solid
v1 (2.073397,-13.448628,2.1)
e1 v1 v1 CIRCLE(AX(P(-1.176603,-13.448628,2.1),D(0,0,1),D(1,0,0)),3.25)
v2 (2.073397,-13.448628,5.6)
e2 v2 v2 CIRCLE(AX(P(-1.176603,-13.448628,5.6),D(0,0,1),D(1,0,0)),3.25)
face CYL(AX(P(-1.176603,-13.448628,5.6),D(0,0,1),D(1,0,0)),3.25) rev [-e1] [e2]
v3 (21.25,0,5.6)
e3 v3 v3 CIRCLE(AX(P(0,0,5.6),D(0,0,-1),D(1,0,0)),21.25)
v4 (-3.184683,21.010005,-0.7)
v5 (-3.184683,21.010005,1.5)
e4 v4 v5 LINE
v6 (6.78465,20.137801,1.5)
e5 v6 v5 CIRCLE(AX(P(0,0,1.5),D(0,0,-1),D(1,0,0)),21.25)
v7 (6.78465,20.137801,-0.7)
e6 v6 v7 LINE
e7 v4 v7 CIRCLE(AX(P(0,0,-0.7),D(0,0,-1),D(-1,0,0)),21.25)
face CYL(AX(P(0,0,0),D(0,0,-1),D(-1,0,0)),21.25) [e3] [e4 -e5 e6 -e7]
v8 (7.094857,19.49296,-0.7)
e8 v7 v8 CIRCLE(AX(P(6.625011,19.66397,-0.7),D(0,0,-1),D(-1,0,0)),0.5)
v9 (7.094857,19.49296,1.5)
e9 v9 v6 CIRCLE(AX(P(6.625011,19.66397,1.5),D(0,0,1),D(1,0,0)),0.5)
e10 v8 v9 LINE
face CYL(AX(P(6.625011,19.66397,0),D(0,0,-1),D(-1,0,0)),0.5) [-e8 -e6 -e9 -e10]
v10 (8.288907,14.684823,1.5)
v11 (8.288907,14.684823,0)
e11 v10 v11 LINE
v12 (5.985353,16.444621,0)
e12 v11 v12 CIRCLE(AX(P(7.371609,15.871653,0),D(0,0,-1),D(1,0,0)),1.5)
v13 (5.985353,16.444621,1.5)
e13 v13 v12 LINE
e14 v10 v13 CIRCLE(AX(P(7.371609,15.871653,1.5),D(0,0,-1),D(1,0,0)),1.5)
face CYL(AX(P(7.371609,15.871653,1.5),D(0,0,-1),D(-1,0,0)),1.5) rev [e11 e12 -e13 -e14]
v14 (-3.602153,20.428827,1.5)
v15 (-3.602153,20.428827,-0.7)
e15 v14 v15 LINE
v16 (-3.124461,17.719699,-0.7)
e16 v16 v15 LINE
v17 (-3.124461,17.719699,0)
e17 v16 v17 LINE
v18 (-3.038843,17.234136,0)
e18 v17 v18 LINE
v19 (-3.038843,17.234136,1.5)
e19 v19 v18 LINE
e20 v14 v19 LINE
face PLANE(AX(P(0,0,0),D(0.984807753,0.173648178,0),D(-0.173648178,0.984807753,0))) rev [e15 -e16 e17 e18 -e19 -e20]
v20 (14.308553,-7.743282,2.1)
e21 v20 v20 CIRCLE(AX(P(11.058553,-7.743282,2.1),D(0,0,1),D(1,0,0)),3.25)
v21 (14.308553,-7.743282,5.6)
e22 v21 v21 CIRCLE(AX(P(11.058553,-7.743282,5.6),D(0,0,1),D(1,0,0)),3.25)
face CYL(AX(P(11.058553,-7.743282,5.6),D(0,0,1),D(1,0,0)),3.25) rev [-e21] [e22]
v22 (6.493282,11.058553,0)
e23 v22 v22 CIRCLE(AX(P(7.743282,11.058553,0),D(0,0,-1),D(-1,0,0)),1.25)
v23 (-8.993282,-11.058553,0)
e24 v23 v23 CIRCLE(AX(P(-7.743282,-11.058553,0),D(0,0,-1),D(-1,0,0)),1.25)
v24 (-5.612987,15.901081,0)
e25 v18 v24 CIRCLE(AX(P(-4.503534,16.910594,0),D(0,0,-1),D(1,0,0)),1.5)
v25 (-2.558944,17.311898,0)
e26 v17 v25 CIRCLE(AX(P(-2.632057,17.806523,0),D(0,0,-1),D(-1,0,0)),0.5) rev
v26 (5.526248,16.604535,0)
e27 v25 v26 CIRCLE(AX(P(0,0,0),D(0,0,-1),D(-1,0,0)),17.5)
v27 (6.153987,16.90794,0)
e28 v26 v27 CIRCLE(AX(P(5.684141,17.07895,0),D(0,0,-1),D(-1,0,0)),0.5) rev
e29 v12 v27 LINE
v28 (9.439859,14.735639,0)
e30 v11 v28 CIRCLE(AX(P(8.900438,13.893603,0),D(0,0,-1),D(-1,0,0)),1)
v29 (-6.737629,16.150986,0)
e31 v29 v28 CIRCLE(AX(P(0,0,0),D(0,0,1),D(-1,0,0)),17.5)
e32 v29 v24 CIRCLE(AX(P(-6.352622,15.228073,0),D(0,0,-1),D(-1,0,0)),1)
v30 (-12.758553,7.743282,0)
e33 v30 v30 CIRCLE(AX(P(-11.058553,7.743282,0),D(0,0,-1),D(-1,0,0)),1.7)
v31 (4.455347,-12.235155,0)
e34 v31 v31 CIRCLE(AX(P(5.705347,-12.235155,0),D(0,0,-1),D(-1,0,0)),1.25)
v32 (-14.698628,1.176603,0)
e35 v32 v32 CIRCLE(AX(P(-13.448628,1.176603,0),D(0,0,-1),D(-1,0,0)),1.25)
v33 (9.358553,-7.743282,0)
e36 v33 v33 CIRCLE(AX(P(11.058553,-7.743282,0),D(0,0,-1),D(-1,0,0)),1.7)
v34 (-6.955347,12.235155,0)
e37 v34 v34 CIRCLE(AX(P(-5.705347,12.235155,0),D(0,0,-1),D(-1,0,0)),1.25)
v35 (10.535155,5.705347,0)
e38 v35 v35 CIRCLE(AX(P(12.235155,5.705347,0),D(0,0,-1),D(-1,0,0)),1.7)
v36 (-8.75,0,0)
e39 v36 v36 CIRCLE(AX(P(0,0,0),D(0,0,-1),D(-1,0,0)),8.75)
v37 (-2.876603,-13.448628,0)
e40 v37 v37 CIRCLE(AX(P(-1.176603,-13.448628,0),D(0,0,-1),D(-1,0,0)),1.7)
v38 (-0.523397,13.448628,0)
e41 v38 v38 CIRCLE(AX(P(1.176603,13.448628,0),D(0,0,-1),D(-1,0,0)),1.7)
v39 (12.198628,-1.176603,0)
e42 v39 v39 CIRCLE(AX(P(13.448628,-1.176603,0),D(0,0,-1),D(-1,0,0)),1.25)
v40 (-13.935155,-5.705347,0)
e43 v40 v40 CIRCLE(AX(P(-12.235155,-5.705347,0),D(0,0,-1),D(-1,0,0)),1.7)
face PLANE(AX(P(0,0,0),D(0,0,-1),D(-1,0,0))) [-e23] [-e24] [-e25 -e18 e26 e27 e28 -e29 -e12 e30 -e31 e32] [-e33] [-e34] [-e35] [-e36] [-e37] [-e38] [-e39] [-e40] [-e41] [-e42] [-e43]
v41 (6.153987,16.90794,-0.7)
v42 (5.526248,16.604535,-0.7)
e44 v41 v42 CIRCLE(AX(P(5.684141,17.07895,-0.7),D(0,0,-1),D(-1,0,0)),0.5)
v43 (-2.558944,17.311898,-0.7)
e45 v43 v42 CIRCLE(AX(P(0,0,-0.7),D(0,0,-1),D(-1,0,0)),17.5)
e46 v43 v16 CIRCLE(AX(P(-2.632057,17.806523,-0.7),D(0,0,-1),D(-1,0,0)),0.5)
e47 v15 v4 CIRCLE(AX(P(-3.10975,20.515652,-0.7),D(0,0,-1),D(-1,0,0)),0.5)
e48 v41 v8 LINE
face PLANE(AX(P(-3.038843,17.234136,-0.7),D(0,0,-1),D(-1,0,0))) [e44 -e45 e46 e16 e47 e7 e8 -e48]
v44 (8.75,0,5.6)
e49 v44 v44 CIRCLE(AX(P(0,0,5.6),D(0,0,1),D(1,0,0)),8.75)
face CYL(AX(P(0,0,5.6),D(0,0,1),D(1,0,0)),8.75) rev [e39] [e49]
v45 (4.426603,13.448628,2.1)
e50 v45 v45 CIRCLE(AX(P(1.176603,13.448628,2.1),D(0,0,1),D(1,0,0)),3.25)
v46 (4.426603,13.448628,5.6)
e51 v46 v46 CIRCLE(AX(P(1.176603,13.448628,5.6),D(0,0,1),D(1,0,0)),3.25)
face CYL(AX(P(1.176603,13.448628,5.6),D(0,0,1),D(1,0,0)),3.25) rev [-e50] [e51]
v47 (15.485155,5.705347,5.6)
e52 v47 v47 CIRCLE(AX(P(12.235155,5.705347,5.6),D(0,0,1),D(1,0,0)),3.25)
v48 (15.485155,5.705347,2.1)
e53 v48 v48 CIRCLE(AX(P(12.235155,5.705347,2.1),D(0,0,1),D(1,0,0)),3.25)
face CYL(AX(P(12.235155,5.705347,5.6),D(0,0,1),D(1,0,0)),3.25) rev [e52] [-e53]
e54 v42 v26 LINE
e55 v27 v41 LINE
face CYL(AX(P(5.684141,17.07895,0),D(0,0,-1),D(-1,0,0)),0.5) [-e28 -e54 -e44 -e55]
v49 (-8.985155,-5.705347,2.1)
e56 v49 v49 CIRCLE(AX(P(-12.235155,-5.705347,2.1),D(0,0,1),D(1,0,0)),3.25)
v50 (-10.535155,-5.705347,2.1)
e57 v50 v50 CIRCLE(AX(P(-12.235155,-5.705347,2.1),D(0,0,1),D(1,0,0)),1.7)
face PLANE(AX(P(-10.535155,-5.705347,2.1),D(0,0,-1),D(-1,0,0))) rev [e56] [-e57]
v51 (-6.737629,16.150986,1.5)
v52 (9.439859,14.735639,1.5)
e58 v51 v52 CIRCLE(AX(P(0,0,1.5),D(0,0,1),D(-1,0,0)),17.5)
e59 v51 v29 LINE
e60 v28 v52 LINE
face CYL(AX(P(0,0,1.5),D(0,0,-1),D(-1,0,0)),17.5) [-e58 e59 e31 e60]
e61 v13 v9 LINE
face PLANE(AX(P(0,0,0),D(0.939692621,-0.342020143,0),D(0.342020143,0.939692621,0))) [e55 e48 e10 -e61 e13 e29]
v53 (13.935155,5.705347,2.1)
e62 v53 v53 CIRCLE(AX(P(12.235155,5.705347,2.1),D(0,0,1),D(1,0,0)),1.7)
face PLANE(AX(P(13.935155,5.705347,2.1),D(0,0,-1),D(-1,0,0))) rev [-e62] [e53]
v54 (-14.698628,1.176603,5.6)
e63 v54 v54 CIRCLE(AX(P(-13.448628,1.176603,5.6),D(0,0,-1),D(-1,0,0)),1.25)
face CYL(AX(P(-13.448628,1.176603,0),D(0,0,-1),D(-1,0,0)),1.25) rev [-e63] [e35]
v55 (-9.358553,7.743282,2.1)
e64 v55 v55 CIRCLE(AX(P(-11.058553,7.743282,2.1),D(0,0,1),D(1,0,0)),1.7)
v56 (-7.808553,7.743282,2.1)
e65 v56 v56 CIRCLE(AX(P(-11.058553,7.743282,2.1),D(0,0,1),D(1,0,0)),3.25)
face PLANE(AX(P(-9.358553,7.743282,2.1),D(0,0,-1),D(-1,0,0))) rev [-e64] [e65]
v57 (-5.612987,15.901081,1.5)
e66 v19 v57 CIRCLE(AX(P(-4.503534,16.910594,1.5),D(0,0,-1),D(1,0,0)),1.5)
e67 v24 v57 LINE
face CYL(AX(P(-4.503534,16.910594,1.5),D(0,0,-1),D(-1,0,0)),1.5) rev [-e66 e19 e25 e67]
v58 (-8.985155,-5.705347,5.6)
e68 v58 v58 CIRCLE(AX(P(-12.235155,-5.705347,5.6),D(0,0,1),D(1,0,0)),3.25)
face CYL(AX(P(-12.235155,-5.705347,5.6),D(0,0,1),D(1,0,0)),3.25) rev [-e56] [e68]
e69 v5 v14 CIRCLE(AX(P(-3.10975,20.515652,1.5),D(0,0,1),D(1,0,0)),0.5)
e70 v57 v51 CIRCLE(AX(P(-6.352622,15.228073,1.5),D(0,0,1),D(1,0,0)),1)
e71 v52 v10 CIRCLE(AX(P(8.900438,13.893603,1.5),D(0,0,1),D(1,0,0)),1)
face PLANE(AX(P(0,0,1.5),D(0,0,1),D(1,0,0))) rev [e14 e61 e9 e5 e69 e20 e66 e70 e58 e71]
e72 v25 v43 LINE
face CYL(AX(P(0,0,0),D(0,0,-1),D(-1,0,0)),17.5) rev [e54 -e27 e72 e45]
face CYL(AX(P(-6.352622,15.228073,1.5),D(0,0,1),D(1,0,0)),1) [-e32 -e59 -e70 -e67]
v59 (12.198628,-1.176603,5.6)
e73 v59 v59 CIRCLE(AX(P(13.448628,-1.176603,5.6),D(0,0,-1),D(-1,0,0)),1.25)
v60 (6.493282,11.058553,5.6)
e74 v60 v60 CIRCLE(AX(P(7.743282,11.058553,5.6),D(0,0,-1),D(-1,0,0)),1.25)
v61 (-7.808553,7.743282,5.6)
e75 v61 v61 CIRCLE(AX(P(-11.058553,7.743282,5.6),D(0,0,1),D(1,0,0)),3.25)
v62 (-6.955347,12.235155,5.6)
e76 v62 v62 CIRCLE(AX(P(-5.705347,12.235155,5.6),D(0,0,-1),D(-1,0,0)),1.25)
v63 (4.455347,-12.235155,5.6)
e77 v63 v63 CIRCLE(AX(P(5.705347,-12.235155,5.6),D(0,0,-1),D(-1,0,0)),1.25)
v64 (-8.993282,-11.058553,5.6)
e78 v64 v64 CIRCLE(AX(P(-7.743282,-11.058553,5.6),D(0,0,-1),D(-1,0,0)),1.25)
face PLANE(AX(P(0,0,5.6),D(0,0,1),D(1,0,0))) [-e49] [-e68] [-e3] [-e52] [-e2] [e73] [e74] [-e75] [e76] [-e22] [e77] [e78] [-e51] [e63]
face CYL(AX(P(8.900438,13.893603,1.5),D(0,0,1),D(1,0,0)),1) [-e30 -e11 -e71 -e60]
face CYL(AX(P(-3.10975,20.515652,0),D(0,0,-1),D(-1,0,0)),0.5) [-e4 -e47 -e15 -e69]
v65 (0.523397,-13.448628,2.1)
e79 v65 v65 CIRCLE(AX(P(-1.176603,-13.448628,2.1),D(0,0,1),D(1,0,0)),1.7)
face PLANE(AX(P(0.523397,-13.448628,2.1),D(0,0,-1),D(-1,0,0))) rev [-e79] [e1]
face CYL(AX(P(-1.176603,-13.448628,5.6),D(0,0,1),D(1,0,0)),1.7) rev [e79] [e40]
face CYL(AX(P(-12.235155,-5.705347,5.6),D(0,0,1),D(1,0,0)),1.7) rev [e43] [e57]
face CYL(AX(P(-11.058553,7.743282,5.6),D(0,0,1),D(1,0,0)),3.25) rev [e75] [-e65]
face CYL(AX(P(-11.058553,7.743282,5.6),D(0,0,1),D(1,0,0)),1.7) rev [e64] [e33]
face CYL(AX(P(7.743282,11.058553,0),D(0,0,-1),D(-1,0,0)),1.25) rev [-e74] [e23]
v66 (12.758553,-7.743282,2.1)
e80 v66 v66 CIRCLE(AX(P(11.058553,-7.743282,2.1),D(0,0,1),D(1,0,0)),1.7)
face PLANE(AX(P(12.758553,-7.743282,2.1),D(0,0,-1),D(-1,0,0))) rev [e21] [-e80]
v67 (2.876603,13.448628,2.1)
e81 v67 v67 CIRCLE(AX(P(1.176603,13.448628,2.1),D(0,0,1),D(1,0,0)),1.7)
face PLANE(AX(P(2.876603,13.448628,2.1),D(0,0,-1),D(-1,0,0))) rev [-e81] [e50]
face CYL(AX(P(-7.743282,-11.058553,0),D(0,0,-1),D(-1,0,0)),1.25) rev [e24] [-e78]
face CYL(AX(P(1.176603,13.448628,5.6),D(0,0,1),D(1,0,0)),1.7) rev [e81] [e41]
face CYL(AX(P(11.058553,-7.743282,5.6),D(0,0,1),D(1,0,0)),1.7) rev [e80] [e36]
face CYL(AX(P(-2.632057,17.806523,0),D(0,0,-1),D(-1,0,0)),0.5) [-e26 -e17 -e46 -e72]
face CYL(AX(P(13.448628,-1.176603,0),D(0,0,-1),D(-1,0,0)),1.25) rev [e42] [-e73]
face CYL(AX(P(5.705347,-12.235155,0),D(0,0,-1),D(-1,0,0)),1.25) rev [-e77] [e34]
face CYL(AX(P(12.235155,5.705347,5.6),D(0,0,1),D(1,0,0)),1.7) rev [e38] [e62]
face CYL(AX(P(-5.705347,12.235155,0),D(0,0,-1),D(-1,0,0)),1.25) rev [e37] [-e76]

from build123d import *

# Parameters (mm, degrees)
SKETCH_1_W                    = 3.75
SKETCH_1_H                    = 0.7
REVOLVE_1_ANGLE               = 30
EXTRUDE_1_DEPTH               = 1.5
EXTRUDE_START                 = -4.1
SKETCH_3_R                    = 21.25
EXTRUDE_2_DEPTH               = 4.1
HOLE_WIZARD_2_5_2_5_1_D       = 2.5
HOLE_WIZARD_17_5_17_5_1_D     = 17.5
HOLE_WIZARD_17_5_17_5_1_DEPTH = 6.3
HOLE_WIZARD_M3_1_D            = 3.4
HOLE_WIZARD_M3_1_DEPTH        = 6.3
HOLE_WIZARD_M3_1_CBORE_D      = 6.5
HOLE_WIZARD_M3_1_CBORE_DEPTH  = 3.5
FILLET_1_R                    = 0.5
FILLET_2_R                    = 1


with BuildPart() as part:
    # 草图1 → 旋转1 (revolve)
    with BuildSketch(Plane(origin=(0, 0, 0), x_dir=(0.34202014332566955, 0.9396926207859082, 0), z_dir=(0.9396926207859082, -0.34202014332566955, 0))):
        with Locations((19.375, -0.35)):
            Rectangle(SKETCH_1_W, SKETCH_1_H)
    revolve(axis=Axis((0, 0, 0), (0, 0, 1)), revolution_arc=REVOLVE_1_ANGLE)

    # 草图2 → 凸台-拉伸1 (add)
    with BuildSketch(Plane.XY):
        with BuildLine():
            Line((-3.038843109, 17.234135678), (-3.690023775, 20.927164752))
            ThreePointArc((-3.690023775, 20.927164752), (1.852059533, 21.169137334), (7.267928046, 19.968468192))
            Line((7.267928046, 19.968468192), (5.985352508, 16.444620864))
            ThreePointArc((5.985352508, 16.444620864), (6.73975713, 14.511225787), (8.703707451, 15.18207748))
            ThreePointArc((8.703707451, 15.18207748), (-1.525225498, -17.433407217), (-5.93513849, 16.462810547))
            ThreePointArc((-5.93513849, 16.462810547), (-4.117517161, 15.461114204), (-3.038843109, 17.234135678))
        make_face()
    extrude(amount=EXTRUDE_1_DEPTH)

    # 草图3 → 凸台-拉伸2 (add)
    with BuildSketch(Plane(origin=(0, 0, 1.5), x_dir=(-1, 0, 0), z_dir=(0, 0, -1)).offset(EXTRUDE_START)):
        with Locations(Location((0, 0, 0), (0, 0, 80))):
            Circle(SKETCH_3_R)
    extrude(amount=EXTRUDE_2_DEPTH)

    # Ø2.5 (2.5) 直径孔1 (through all)
    with Locations(Plane(origin=(0, 0, 0), x_dir=(-1, 0, 0), z_dir=(0, 0, -1))):
        with Locations((13.448628424, 1.176602527), (7.743281891, -11.058552598), (-5.705346534, -12.235155125), (-13.448628424, -1.176602527), (-7.743281891, 11.058552598), (5.705346533, 12.235155125)):
            Hole(HOLE_WIZARD_2_5_2_5_1_D / 2)

    # Ø17.5 (17.5) 直径孔1
    with Locations(Plane.XY.offset(5.6)):
        with Locations((0, 0)):
            Hole(HOLE_WIZARD_17_5_17_5_1_D / 2, depth=HOLE_WIZARD_17_5_17_5_1_DEPTH)

    # M3 六角头机械螺钉的柱形沉头孔1
    with Locations(Plane.XY.offset(5.6)):
        with Locations((12.235155125, 5.705346533), (1.176602527, 13.448628424), (-11.058552598, 7.743281891), (-12.235155125, -5.705346533), (-1.176602527, -13.448628424), (11.058552598, -7.743281891)):
            CounterBoreHole(HOLE_WIZARD_M3_1_D / 2, HOLE_WIZARD_M3_1_CBORE_D / 2, HOLE_WIZARD_M3_1_CBORE_DEPTH, depth=HOLE_WIZARD_M3_1_DEPTH)

    # 圆角1
    # the kernel refuses this fillet: 0.5 mm, written as the material it takes off along each edge
    with BuildSketch(Plane(origin=(-3.038843109, 17.234135678, 0), x_dir=(-0.17364817766693064, 0.984807753012208, -5.075305255429288e-15), z_dir=(0, 0, -1))) as fillet_1_piece_1:
        with BuildLine():
            CenterArc((0.493054215, 0.5), FILLET_1_R, 181.591754177, 88.408245823)
            ThreePointArc((-0.006752846, 0.486111111), (-0.001688293, 0.243079006), (0, 0))
            Line((0, 0), (0.493054215, 0))
        make_face()
    extrude(amount=1.932635539, mode=Mode.SUBTRACT)
    with BuildSketch(Plane(origin=(5.985352508, 16.444620864, 0), x_dir=(0.34202014332566866, 0.9396926207859084, -5.075305255429287e-15), z_dir=(0, 0, -1))) as fillet_1_piece_2:
        with BuildLine():
            CenterArc((0.493054215, -0.5), FILLET_1_R, 90, 88.408245823)
            ThreePointArc((-0.006752846, -0.486111111), (-0.001688293, -0.243079006), (0, 0))
            Line((0, 0), (0.493054215, 0))
        make_face()
    extrude(amount=1.932635539, mode=Mode.SUBTRACT)
    with BuildSketch(Plane(origin=(7.267928046, 19.968468192, 1.5), x_dir=(-0.943745429784676, 0.33067289541257716, 0), z_dir=(0, 0, -1)), Plane(origin=(-3.690023775, 20.927164752, -1.980213416), x_dir=(0.9868285618140304, 0.1617695570496889, 5.378398972447093e-15), z_dir=(0, 0, 1))) as fillet_1_piece_3:
        with BuildLine():
            CenterArc((0.506060833, -0.499963704), FILLET_1_R, 89.309622583, 91.380754834)
            Line((0.006097129, -0.505988237), (0, 0))
            ThreePointArc((0, 0), (0.256042683, 0.001542594), (0.512085366, 0))
        make_face()
    extrude(amount=3.480213416, mode=Mode.SUBTRACT)
    with BuildSketch(Plane(origin=(5.985352508, 16.444620864, 0), x_dir=(0.3420201433260408, 0.9396926207857731, 0), z_dir=(0, 0, 1))) as fillet_1_piece_4:
        with BuildLine():
            CenterArc((0.009949299, 0.5), FILLET_1_R, 267.872834894, 2.127165106)
            ThreePointArc((-0.008609454, 0.000344546), (-0.00430448, 0.000178455), (0, 0))
            Line((0, 0), (0.009949299, 0))
        make_face()
    extrude(amount=1.5, mode=Mode.SUBTRACT)
    with BuildSketch(Plane(origin=(-3.038843109, 17.234135678, 0), x_dir=(-0.17364817766558338, 0.9848077530124456, 0), z_dir=(0, 0, 1))) as fillet_1_piece_5:
        with BuildLine():
            CenterArc((0.009949299, -0.5), FILLET_1_R, 90, 2.127165106)
            ThreePointArc((-0.008609454, -0.000344546), (-0.00430448, -0.000178455), (0, 0))
            Line((0, 0), (0.009949299, 0))
        make_face()
    extrude(amount=1.5, mode=Mode.SUBTRACT)

    # 圆角2
    fillet_2_edges = [part.edges().sort_by_distance(p)[0] for p in [
        (-5.93513849, 16.462810547, 0.75),
        (8.703707451, 15.18207748, 0.75),
    ]]
    fillet(fillet_2_edges, radius=FILLET_2_R)


solid = part.part
